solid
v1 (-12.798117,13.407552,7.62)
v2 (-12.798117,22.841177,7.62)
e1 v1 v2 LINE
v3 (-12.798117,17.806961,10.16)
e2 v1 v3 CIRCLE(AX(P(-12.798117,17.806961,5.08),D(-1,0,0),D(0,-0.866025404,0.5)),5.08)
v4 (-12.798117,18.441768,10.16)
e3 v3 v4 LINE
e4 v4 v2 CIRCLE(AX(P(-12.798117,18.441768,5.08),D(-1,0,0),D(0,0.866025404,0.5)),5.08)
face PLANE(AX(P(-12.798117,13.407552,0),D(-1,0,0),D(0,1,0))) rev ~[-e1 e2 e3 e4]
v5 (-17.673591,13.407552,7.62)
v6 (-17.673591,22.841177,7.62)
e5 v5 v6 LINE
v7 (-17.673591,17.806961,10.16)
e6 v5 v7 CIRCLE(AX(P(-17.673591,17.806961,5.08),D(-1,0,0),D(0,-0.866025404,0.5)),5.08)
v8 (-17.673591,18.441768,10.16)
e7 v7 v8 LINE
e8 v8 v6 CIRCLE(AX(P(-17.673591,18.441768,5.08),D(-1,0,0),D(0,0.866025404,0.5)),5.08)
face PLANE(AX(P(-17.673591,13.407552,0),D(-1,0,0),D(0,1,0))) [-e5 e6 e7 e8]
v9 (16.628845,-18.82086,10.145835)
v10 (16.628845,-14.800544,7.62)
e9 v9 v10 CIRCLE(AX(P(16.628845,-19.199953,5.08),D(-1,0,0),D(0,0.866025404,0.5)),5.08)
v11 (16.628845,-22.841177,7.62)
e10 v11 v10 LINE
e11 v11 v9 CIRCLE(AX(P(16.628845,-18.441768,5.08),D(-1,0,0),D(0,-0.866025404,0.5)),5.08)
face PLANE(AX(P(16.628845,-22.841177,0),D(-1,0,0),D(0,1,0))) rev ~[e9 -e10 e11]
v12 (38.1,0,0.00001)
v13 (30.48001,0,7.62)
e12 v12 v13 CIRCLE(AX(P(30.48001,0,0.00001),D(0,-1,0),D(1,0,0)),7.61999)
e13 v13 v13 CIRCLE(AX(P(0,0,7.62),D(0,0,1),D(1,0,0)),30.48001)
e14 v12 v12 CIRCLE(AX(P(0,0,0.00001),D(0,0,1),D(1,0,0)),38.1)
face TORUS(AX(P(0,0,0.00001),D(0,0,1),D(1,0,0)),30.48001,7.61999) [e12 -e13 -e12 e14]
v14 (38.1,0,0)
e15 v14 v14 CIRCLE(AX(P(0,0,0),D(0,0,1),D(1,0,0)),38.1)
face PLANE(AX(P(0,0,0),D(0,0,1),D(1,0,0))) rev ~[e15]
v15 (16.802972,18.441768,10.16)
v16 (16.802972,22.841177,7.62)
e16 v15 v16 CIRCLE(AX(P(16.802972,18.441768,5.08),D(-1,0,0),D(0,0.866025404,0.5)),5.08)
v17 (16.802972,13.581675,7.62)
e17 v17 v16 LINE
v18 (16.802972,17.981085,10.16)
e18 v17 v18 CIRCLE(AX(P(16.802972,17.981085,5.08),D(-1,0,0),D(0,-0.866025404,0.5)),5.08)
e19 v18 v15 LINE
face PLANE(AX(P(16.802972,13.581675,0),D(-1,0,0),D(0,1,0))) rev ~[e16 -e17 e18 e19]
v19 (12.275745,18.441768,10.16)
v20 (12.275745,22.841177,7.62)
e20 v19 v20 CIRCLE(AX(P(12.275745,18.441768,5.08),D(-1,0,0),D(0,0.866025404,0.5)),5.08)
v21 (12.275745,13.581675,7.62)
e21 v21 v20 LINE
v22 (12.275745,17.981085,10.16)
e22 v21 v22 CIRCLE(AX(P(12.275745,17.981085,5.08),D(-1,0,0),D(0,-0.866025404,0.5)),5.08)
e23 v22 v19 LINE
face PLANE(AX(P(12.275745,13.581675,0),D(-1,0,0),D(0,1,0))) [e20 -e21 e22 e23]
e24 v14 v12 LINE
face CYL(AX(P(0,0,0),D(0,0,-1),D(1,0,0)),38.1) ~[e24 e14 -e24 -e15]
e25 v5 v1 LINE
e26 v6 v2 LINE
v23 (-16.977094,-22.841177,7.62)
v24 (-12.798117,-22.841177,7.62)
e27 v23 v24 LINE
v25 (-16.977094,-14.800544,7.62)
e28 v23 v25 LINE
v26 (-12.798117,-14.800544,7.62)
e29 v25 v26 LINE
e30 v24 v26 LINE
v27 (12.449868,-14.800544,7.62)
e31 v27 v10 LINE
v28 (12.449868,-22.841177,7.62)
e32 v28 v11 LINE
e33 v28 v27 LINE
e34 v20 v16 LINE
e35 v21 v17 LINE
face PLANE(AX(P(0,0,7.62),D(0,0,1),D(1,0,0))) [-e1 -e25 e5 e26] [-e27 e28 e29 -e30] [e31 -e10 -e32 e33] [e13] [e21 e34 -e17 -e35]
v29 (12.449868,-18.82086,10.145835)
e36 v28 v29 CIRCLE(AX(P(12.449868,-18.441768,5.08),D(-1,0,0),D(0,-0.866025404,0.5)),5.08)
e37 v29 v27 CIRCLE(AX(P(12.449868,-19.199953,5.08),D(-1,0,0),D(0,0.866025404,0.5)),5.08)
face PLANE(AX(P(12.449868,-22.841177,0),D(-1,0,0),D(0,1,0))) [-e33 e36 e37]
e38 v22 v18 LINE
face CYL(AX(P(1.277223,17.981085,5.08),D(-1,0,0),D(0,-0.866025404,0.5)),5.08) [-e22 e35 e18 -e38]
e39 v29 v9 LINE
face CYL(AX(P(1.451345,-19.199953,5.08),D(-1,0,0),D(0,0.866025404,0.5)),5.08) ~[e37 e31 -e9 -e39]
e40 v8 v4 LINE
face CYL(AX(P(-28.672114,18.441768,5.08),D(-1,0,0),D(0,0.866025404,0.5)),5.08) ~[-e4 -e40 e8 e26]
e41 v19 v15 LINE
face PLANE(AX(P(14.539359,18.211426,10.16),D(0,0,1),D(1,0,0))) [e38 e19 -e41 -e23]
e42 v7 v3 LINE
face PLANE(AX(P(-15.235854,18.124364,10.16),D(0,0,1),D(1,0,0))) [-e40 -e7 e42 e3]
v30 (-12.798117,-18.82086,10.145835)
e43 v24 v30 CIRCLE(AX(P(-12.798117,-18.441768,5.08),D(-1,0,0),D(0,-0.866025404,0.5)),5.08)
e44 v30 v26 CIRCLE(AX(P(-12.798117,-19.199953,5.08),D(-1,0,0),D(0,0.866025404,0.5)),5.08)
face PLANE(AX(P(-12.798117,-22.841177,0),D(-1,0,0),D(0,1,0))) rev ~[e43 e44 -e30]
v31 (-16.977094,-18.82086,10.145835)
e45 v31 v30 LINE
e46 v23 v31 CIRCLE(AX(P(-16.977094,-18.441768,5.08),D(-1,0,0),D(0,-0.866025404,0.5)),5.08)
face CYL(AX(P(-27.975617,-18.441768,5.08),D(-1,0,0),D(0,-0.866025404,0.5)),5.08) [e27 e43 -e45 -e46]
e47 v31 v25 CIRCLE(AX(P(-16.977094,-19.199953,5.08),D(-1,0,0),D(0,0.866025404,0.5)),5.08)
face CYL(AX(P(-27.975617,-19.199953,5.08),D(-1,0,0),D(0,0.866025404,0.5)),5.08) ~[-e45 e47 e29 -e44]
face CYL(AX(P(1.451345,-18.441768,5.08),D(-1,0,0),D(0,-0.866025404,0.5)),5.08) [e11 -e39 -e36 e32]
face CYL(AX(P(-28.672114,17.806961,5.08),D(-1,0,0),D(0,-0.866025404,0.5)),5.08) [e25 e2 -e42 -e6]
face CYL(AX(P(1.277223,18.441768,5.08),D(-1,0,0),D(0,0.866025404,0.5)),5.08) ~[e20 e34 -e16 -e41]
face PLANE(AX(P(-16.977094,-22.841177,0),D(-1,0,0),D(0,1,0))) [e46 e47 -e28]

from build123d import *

# Parameters (mm, degrees)
F0_R        = 38.1
F0_W        = 4.1789766401
F0_H        = 8.0406331347
F0_W_2      = 4.8754736781
F0_H_2      = 9.433625348
F0_W_3      = 4.5272270218
F0_H_3      = 9.2595015542
F1_DEPTH    = 7.62
F2_R        = 7.61999
F3_DEPTH    = 10.16
F4_T1_DEPTH = 26.1760218962
F4_T3_DEPTH = 26.1760218962
F4_T5_DEPTH = 26.5242722779
F4_T7_DEPTH = 26.8725189342


# Not quite as in the source:
# - a fillet or chamfer that OpenCascade refuses, or shapes differently, is made with other operations: its cross-section is extruded or revolved along the edge and cut away or added
# - a fillet or chamfer is up to 0.001 mm smaller than in the source, because OpenCascade refuses the exact size


with BuildPart() as f1:
    # F0 (on Top) → F1 (new body)
    with BuildSketch(Plane.XY):
        Circle(F0_R)
        with Locations((-14.8876057938, -18.8208604642)):
            Rectangle(F0_W, F0_H, mode=Mode.SUBTRACT)
        with Locations((14.5393563434, -18.8208604642)):
            Rectangle(F0_W, F0_H, mode=Mode.SUBTRACT)
        with Locations((-15.2358543128, 18.1243643575)):
            Rectangle(F0_W_2, F0_H_2, mode=Mode.SUBTRACT)
        with Locations((14.5393586718, 18.2114262544)):
            Rectangle(F0_W_3, F0_H_3, mode=Mode.SUBTRACT)
    extrude(amount=F1_DEPTH)

    # F2 (radius 7.62 in the source; OpenCascade refuses exactly that, so slightly less here)
    f2_edges = [f1.edges().sort_by_distance(p)[0] for p in [
        (-38.1, 0, 7.62),
    ]]
    fillet(f2_edges, radius=F2_R)

    # F0 (on Top) → F3 (join)
    with BuildSketch(Plane.XY):
        with Locations((-15.2358543128, 18.1243643575)):
            Rectangle(F0_W_2, F0_H_2)
        with Locations((14.5393586718, 18.2114262544)):
            Rectangle(F0_W_3, F0_H_3)
        with Locations((14.5393563434, -18.8208604642)):
            Rectangle(F0_W, F0_H)
        with Locations((-14.8876057938, -18.8208604642)):
            Rectangle(F0_W, F0_H)
    extrude(amount=F3_DEPTH)

    # F4: fillet of radius 5.08 on 8 edges, made by hand

    # F4_s2 → F4_t1 (cut)
    with BuildSketch(Plane.YZ.offset(-27.9756167419)):
        with BuildLine():
            ThreePointArc((-22.8411770315, 7.62), (-20.9817679803, 9.4794090512), (-18.4417679803, 10.16))
            Line((-18.4417679803, 10.16), (-22.8411770315, 10.16))
            Line((-22.8411770315, 10.16), (-22.8411770315, 7.62))
        make_face()
        with BuildLine():
            ThreePointArc((-14.8005438969, 7.62), (-16.6599529481, 9.4794090512), (-19.1999529481, 10.16))
            Line((-19.1999529481, 10.16), (-14.8005438969, 10.16))
            Line((-14.8005438969, 10.16), (-14.8005438969, 7.62))
        make_face()
    extrude(amount=F4_T1_DEPTH, mode=Mode.SUBTRACT)

    # F4_s4 → F4_t3 (cut)
    with BuildSketch(Plane.YZ.offset(1.4513453953)):
        with BuildLine():
            ThreePointArc((-22.8411770315, 7.62), (-20.9817679803, 9.4794090512), (-18.4417679803, 10.16))
            Line((-18.4417679803, 10.16), (-22.8411770315, 10.16))
            Line((-22.8411770315, 10.16), (-22.8411770315, 7.62))
        make_face()
        with BuildLine():
            ThreePointArc((-14.8005438969, 7.62), (-16.6599529481, 9.4794090512), (-19.1999529481, 10.16))
            Line((-19.1999529481, 10.16), (-14.8005438969, 10.16))
            Line((-14.8005438969, 10.16), (-14.8005438969, 7.62))
        make_face()
    extrude(amount=F4_T3_DEPTH, mode=Mode.SUBTRACT)

    # F4_s6 → F4_t5 (cut)
    with BuildSketch(Plane.YZ.offset(1.2772225328)):
        with BuildLine():
            ThreePointArc((13.5816754773, 7.62), (15.4410845286, 9.4794090512), (17.9810845286, 10.16))
            Line((17.9810845286, 10.16), (13.5816754773, 10.16))
            Line((13.5816754773, 10.16), (13.5816754773, 7.62))
        make_face()
        with BuildLine():
            ThreePointArc((22.8411770315, 7.62), (20.9817679803, 9.4794090512), (18.4417679803, 10.16))
            Line((18.4417679803, 10.16), (22.8411770315, 10.16))
            Line((22.8411770315, 10.16), (22.8411770315, 7.62))
        make_face()
    extrude(amount=F4_T5_DEPTH, mode=Mode.SUBTRACT)

    # F4_s8 → F4_t7 (cut)
    with BuildSketch(Plane.YZ.offset(-28.6721137799)):
        with BuildLine():
            ThreePointArc((13.4075516835, 7.62), (15.2669607347, 9.4794090512), (17.8069607347, 10.16))
            Line((17.8069607347, 10.16), (13.4075516835, 10.16))
            Line((13.4075516835, 10.16), (13.4075516835, 7.62))
        make_face()
        with BuildLine():
            ThreePointArc((22.8411770315, 7.62), (20.9817679803, 9.4794090512), (18.4417679803, 10.16))
            Line((18.4417679803, 10.16), (22.8411770315, 10.16))
            Line((22.8411770315, 10.16), (22.8411770315, 7.62))
        make_face()
    extrude(amount=F4_T7_DEPTH, mode=Mode.SUBTRACT)


solid = f1.part
